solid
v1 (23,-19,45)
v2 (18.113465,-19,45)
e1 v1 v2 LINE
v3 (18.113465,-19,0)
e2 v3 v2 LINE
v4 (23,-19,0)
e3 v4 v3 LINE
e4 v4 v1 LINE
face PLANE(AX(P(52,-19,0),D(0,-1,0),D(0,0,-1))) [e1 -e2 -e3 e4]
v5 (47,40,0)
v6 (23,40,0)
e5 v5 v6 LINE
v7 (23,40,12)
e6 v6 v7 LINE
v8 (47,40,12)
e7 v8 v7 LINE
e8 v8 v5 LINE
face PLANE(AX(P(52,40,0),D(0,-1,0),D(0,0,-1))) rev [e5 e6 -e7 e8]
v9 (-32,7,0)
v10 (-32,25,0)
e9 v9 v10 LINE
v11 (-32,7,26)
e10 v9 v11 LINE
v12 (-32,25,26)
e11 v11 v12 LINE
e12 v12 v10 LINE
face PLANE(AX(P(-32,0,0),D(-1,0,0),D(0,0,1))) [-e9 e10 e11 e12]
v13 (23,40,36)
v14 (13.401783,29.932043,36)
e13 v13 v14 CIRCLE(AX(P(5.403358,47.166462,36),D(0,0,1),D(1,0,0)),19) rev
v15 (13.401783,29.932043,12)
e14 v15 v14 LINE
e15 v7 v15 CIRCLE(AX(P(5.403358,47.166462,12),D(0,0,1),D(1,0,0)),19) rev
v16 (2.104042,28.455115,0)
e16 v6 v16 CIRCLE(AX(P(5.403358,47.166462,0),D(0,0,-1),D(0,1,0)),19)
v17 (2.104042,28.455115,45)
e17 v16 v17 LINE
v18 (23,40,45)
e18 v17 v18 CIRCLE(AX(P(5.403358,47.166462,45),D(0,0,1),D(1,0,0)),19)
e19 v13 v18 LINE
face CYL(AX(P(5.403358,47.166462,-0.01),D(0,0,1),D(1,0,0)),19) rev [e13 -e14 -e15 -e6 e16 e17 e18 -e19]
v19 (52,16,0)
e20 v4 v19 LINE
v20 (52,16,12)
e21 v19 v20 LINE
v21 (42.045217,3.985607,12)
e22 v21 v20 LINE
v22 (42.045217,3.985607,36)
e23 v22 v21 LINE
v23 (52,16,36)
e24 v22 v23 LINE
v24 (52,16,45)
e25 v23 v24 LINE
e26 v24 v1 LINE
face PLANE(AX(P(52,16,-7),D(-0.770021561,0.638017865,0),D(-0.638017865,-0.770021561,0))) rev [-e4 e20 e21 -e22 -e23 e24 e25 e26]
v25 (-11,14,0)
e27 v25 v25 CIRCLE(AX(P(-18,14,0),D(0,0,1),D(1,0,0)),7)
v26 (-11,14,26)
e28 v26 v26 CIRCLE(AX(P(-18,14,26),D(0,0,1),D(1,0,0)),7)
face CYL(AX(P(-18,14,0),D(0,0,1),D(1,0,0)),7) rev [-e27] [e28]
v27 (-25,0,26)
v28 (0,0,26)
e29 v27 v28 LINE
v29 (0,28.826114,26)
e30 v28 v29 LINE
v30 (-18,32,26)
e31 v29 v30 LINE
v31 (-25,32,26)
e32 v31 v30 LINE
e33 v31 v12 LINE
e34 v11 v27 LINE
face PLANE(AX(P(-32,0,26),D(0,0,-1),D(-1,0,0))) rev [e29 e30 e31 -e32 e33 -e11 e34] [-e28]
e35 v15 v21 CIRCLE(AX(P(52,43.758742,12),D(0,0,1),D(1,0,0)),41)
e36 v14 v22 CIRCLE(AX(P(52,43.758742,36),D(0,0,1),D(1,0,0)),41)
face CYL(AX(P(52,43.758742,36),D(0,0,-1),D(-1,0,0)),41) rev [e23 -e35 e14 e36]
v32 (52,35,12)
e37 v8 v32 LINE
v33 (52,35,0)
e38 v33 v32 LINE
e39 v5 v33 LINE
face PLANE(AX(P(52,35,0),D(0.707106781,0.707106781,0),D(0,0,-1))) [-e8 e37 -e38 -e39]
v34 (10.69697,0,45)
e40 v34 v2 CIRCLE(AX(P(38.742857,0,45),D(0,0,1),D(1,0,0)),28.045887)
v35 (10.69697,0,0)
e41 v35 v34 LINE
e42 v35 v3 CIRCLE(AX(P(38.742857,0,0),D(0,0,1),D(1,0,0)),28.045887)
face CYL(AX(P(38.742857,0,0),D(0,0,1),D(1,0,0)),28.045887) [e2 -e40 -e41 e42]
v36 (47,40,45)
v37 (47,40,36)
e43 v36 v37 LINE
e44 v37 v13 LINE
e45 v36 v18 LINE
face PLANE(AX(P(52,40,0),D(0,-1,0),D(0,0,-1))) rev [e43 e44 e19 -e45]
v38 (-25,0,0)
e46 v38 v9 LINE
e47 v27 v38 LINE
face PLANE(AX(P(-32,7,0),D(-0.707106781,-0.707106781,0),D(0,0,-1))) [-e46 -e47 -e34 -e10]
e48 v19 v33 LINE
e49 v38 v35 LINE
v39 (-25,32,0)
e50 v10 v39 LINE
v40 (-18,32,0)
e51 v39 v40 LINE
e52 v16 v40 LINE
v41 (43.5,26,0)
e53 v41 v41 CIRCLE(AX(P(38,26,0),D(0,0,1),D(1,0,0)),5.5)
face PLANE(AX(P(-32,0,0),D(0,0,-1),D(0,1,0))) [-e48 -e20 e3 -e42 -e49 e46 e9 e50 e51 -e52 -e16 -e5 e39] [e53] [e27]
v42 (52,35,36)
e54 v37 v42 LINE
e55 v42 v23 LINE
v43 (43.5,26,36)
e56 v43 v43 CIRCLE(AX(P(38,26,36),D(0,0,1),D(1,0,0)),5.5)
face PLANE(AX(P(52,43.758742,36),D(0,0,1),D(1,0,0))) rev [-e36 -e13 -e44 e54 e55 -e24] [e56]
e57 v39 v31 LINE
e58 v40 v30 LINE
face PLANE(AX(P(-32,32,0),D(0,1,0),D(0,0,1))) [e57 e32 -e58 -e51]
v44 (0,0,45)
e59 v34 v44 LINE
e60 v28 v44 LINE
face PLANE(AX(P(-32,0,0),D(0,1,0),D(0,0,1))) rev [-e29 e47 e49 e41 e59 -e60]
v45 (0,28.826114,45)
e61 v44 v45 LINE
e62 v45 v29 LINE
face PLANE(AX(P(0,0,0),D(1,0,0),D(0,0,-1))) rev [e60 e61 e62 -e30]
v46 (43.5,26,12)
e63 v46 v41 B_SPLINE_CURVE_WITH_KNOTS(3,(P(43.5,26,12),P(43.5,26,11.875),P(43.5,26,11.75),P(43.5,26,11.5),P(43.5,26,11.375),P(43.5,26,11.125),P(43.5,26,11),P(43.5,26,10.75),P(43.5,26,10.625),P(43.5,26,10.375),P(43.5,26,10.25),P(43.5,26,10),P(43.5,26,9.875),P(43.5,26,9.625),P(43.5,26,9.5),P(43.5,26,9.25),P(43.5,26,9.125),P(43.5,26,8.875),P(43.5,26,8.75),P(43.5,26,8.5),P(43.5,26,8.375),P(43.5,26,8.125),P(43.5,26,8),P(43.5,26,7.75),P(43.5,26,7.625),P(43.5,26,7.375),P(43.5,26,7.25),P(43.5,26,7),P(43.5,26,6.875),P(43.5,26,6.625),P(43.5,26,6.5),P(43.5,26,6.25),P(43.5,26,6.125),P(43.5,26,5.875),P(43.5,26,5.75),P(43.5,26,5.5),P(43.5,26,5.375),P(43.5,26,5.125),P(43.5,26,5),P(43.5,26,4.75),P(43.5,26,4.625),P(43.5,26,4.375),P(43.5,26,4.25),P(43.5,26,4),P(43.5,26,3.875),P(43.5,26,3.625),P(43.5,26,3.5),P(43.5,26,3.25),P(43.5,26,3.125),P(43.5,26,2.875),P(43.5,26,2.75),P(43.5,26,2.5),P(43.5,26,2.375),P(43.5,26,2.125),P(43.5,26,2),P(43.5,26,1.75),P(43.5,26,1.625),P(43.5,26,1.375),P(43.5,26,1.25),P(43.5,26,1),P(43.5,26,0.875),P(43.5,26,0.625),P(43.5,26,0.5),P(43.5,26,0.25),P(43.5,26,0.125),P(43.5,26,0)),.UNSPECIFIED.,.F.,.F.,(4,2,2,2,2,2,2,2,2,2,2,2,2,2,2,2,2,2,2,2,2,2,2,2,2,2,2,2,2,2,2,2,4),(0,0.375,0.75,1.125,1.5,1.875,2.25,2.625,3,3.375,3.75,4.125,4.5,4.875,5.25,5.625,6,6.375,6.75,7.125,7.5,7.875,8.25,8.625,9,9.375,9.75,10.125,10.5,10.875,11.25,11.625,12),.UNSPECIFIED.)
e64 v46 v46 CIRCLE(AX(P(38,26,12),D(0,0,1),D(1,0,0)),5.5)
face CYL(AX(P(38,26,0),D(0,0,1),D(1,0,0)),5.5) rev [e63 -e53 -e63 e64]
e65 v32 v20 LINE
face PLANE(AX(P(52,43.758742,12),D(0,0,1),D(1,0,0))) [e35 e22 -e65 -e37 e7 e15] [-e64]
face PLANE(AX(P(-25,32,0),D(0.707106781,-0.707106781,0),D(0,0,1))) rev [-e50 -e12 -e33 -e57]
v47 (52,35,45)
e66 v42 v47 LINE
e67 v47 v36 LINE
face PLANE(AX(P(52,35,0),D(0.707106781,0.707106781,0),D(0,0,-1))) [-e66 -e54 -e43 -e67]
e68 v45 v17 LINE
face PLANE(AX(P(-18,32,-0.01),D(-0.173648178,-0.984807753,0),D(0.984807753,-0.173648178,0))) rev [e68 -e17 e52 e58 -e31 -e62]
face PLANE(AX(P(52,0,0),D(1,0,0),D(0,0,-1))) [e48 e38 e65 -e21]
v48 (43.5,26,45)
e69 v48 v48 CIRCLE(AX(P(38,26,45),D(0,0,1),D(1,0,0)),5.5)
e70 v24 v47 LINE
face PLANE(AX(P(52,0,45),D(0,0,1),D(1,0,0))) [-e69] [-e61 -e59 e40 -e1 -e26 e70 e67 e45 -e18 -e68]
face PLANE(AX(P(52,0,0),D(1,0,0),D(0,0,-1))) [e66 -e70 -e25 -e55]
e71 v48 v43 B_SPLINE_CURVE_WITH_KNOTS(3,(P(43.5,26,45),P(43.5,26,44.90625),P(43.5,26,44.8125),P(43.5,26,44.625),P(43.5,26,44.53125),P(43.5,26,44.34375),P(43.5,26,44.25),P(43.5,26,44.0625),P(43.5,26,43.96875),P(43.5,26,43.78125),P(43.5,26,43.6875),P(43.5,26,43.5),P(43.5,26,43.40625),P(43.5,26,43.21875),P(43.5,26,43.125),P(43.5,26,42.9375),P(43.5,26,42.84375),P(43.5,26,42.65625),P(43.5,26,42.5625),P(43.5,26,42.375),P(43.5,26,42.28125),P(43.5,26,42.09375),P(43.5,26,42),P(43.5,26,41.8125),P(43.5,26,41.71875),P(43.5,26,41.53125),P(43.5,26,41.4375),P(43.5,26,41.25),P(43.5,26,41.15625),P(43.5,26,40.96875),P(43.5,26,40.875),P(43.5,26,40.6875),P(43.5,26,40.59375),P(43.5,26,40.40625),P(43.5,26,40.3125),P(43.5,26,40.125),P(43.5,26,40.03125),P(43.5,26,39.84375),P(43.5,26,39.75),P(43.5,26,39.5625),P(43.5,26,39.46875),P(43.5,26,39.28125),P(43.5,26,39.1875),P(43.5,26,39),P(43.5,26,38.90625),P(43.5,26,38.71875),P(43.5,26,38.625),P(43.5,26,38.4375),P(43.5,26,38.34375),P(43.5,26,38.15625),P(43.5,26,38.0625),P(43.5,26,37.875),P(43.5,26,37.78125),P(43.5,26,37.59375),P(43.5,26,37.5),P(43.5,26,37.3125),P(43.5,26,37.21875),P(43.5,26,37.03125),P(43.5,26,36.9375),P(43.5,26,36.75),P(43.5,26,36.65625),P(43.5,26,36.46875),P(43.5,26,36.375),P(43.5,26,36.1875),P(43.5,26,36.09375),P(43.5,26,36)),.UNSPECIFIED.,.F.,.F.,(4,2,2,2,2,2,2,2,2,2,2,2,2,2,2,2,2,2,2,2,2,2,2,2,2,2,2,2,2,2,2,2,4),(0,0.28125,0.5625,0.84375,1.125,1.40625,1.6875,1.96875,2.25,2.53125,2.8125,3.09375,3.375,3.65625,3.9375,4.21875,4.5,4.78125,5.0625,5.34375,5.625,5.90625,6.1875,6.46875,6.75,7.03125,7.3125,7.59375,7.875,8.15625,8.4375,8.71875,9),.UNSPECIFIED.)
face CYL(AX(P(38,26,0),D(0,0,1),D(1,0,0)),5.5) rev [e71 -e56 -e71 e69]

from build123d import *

# Parameters (mm, degrees)
SKETCH1_W           = 26
SKETCH1_H           = 32
BOSS_EXTRUDE1_DEPTH = 32
SKETCH2_W           = 45
SKETCH2_H           = 40
SKETCH2_H_2         = 19
BOSS_EXTRUDE2_DEPTH = 52
CHAMFER1_SIZE       = 7
SKETCH3_R           = 7
CUT_EXTRUDE1_DEPTH  = 71.569115058
CHAMFER2_SIZE       = 5
SPLIT1_DEPTH        = 45
CUT_EXTRUDE2_DEPTH  = 52
CUT_EXTRUDE7_DEPTH  = 80.555012413
SKETCH8_R           = 41
CUT_EXTRUDE8_DEPTH  = 24
SKETCH9_R           = 5.5
CUT_EXTRUDE9_DEPTH  = 80.555012413


# Read off the part's stored shape, not the designer's step: Split1
with BuildPart() as part:
    # Sketch1 → Boss-Extrude1 (new body)
    with BuildSketch(Plane(origin=(0, 0, 0), x_dir=(0, 0, -1), z_dir=(1, 0, 0))):
        with Locations((-13, 16)):
            Rectangle(SKETCH1_W, SKETCH1_H)
    extrude(amount=-BOSS_EXTRUDE1_DEPTH)

    # Sketch2 → Boss-Extrude2 (add)
    with BuildSketch(Plane(origin=(0, 0, 0), x_dir=(0, 0, -1), z_dir=(1, 0, 0))):
        with Locations((-22.5, 20)):
            Rectangle(SKETCH2_W, SKETCH2_H)
        with Locations((-22.5, -9.5)):
            Rectangle(SKETCH2_W, SKETCH2_H_2)
    extrude(amount=BOSS_EXTRUDE2_DEPTH)

    # Chamfer1
    chamfer1_edges = [part.edges().sort_by_distance(p)[0] for p in [
        (-32, 0, 13),
        (-32, 32, 13),
    ]]
    chamfer(chamfer1_edges, length=CHAMFER1_SIZE)

    # Sketch3 → Cut-Extrude1 (cut, through all)
    with BuildSketch(Plane.XY.offset(26)):
        with Locations((-18, 14)):
            Circle(SKETCH3_R)
    extrude(amount=-CUT_EXTRUDE1_DEPTH, mode=Mode.SUBTRACT)

    # Chamfer2
    chamfer2_edges = [part.edges().sort_by_distance(p)[0] for p in [
        (52, 40, 22.5),
    ]]
    chamfer(chamfer2_edges, length=CHAMFER2_SIZE)

    # Split1 outline → Split1 (cut)
    with BuildSketch(Plane.XY):
        with BuildLine():
            ThreePointArc((2.104042352, 28.455114912), (14.591637328, 30.535902458), (23, 40))
            Line((23, 40), (0, 40))
            Line((0, 40), (0, 32))
            Line((0, 32), (-18, 32))
            Line((-18, 32), (2.104042352, 28.455114912))
        make_face()
    extrude(amount=SPLIT1_DEPTH, mode=Mode.SUBTRACT)

    # Sketch6 → Cut-Extrude2 (cut)
    with BuildSketch(Plane.XY.offset(45)):
        Polygon((52, -19), (52, 16), (23, -19), align=None)
    extrude(amount=-CUT_EXTRUDE2_DEPTH, mode=Mode.SUBTRACT)

    # Sketch7 → Cut-Extrude7 (cut, through all)
    with BuildSketch(Plane.XY.offset(45)):
        with BuildLine():
            ThreePointArc((18.113465426, -19), (12.616803089, -10.198093068), (10.696969697, 0))
            Line((10.696969697, 0), (0, 0))
            Line((0, 0), (0, -19))
            Line((0, -19), (18.113465426, -19))
        make_face()
    extrude(amount=-CUT_EXTRUDE7_DEPTH, mode=Mode.SUBTRACT)

    # Sketch8 → Cut-Extrude8 (cut)
    with BuildSketch(Plane.XY.offset(12)):
        with Locations((52, 43.758742169)):
            Circle(SKETCH8_R)
    extrude(amount=CUT_EXTRUDE8_DEPTH, mode=Mode.SUBTRACT)

    # Sketch9 → Cut-Extrude9 (cut, through all)
    with BuildSketch(Plane.XY.offset(45)):
        with Locations((38, 26)):
            Circle(SKETCH9_R)
    extrude(amount=-CUT_EXTRUDE9_DEPTH, mode=Mode.SUBTRACT)


solid = part.part
